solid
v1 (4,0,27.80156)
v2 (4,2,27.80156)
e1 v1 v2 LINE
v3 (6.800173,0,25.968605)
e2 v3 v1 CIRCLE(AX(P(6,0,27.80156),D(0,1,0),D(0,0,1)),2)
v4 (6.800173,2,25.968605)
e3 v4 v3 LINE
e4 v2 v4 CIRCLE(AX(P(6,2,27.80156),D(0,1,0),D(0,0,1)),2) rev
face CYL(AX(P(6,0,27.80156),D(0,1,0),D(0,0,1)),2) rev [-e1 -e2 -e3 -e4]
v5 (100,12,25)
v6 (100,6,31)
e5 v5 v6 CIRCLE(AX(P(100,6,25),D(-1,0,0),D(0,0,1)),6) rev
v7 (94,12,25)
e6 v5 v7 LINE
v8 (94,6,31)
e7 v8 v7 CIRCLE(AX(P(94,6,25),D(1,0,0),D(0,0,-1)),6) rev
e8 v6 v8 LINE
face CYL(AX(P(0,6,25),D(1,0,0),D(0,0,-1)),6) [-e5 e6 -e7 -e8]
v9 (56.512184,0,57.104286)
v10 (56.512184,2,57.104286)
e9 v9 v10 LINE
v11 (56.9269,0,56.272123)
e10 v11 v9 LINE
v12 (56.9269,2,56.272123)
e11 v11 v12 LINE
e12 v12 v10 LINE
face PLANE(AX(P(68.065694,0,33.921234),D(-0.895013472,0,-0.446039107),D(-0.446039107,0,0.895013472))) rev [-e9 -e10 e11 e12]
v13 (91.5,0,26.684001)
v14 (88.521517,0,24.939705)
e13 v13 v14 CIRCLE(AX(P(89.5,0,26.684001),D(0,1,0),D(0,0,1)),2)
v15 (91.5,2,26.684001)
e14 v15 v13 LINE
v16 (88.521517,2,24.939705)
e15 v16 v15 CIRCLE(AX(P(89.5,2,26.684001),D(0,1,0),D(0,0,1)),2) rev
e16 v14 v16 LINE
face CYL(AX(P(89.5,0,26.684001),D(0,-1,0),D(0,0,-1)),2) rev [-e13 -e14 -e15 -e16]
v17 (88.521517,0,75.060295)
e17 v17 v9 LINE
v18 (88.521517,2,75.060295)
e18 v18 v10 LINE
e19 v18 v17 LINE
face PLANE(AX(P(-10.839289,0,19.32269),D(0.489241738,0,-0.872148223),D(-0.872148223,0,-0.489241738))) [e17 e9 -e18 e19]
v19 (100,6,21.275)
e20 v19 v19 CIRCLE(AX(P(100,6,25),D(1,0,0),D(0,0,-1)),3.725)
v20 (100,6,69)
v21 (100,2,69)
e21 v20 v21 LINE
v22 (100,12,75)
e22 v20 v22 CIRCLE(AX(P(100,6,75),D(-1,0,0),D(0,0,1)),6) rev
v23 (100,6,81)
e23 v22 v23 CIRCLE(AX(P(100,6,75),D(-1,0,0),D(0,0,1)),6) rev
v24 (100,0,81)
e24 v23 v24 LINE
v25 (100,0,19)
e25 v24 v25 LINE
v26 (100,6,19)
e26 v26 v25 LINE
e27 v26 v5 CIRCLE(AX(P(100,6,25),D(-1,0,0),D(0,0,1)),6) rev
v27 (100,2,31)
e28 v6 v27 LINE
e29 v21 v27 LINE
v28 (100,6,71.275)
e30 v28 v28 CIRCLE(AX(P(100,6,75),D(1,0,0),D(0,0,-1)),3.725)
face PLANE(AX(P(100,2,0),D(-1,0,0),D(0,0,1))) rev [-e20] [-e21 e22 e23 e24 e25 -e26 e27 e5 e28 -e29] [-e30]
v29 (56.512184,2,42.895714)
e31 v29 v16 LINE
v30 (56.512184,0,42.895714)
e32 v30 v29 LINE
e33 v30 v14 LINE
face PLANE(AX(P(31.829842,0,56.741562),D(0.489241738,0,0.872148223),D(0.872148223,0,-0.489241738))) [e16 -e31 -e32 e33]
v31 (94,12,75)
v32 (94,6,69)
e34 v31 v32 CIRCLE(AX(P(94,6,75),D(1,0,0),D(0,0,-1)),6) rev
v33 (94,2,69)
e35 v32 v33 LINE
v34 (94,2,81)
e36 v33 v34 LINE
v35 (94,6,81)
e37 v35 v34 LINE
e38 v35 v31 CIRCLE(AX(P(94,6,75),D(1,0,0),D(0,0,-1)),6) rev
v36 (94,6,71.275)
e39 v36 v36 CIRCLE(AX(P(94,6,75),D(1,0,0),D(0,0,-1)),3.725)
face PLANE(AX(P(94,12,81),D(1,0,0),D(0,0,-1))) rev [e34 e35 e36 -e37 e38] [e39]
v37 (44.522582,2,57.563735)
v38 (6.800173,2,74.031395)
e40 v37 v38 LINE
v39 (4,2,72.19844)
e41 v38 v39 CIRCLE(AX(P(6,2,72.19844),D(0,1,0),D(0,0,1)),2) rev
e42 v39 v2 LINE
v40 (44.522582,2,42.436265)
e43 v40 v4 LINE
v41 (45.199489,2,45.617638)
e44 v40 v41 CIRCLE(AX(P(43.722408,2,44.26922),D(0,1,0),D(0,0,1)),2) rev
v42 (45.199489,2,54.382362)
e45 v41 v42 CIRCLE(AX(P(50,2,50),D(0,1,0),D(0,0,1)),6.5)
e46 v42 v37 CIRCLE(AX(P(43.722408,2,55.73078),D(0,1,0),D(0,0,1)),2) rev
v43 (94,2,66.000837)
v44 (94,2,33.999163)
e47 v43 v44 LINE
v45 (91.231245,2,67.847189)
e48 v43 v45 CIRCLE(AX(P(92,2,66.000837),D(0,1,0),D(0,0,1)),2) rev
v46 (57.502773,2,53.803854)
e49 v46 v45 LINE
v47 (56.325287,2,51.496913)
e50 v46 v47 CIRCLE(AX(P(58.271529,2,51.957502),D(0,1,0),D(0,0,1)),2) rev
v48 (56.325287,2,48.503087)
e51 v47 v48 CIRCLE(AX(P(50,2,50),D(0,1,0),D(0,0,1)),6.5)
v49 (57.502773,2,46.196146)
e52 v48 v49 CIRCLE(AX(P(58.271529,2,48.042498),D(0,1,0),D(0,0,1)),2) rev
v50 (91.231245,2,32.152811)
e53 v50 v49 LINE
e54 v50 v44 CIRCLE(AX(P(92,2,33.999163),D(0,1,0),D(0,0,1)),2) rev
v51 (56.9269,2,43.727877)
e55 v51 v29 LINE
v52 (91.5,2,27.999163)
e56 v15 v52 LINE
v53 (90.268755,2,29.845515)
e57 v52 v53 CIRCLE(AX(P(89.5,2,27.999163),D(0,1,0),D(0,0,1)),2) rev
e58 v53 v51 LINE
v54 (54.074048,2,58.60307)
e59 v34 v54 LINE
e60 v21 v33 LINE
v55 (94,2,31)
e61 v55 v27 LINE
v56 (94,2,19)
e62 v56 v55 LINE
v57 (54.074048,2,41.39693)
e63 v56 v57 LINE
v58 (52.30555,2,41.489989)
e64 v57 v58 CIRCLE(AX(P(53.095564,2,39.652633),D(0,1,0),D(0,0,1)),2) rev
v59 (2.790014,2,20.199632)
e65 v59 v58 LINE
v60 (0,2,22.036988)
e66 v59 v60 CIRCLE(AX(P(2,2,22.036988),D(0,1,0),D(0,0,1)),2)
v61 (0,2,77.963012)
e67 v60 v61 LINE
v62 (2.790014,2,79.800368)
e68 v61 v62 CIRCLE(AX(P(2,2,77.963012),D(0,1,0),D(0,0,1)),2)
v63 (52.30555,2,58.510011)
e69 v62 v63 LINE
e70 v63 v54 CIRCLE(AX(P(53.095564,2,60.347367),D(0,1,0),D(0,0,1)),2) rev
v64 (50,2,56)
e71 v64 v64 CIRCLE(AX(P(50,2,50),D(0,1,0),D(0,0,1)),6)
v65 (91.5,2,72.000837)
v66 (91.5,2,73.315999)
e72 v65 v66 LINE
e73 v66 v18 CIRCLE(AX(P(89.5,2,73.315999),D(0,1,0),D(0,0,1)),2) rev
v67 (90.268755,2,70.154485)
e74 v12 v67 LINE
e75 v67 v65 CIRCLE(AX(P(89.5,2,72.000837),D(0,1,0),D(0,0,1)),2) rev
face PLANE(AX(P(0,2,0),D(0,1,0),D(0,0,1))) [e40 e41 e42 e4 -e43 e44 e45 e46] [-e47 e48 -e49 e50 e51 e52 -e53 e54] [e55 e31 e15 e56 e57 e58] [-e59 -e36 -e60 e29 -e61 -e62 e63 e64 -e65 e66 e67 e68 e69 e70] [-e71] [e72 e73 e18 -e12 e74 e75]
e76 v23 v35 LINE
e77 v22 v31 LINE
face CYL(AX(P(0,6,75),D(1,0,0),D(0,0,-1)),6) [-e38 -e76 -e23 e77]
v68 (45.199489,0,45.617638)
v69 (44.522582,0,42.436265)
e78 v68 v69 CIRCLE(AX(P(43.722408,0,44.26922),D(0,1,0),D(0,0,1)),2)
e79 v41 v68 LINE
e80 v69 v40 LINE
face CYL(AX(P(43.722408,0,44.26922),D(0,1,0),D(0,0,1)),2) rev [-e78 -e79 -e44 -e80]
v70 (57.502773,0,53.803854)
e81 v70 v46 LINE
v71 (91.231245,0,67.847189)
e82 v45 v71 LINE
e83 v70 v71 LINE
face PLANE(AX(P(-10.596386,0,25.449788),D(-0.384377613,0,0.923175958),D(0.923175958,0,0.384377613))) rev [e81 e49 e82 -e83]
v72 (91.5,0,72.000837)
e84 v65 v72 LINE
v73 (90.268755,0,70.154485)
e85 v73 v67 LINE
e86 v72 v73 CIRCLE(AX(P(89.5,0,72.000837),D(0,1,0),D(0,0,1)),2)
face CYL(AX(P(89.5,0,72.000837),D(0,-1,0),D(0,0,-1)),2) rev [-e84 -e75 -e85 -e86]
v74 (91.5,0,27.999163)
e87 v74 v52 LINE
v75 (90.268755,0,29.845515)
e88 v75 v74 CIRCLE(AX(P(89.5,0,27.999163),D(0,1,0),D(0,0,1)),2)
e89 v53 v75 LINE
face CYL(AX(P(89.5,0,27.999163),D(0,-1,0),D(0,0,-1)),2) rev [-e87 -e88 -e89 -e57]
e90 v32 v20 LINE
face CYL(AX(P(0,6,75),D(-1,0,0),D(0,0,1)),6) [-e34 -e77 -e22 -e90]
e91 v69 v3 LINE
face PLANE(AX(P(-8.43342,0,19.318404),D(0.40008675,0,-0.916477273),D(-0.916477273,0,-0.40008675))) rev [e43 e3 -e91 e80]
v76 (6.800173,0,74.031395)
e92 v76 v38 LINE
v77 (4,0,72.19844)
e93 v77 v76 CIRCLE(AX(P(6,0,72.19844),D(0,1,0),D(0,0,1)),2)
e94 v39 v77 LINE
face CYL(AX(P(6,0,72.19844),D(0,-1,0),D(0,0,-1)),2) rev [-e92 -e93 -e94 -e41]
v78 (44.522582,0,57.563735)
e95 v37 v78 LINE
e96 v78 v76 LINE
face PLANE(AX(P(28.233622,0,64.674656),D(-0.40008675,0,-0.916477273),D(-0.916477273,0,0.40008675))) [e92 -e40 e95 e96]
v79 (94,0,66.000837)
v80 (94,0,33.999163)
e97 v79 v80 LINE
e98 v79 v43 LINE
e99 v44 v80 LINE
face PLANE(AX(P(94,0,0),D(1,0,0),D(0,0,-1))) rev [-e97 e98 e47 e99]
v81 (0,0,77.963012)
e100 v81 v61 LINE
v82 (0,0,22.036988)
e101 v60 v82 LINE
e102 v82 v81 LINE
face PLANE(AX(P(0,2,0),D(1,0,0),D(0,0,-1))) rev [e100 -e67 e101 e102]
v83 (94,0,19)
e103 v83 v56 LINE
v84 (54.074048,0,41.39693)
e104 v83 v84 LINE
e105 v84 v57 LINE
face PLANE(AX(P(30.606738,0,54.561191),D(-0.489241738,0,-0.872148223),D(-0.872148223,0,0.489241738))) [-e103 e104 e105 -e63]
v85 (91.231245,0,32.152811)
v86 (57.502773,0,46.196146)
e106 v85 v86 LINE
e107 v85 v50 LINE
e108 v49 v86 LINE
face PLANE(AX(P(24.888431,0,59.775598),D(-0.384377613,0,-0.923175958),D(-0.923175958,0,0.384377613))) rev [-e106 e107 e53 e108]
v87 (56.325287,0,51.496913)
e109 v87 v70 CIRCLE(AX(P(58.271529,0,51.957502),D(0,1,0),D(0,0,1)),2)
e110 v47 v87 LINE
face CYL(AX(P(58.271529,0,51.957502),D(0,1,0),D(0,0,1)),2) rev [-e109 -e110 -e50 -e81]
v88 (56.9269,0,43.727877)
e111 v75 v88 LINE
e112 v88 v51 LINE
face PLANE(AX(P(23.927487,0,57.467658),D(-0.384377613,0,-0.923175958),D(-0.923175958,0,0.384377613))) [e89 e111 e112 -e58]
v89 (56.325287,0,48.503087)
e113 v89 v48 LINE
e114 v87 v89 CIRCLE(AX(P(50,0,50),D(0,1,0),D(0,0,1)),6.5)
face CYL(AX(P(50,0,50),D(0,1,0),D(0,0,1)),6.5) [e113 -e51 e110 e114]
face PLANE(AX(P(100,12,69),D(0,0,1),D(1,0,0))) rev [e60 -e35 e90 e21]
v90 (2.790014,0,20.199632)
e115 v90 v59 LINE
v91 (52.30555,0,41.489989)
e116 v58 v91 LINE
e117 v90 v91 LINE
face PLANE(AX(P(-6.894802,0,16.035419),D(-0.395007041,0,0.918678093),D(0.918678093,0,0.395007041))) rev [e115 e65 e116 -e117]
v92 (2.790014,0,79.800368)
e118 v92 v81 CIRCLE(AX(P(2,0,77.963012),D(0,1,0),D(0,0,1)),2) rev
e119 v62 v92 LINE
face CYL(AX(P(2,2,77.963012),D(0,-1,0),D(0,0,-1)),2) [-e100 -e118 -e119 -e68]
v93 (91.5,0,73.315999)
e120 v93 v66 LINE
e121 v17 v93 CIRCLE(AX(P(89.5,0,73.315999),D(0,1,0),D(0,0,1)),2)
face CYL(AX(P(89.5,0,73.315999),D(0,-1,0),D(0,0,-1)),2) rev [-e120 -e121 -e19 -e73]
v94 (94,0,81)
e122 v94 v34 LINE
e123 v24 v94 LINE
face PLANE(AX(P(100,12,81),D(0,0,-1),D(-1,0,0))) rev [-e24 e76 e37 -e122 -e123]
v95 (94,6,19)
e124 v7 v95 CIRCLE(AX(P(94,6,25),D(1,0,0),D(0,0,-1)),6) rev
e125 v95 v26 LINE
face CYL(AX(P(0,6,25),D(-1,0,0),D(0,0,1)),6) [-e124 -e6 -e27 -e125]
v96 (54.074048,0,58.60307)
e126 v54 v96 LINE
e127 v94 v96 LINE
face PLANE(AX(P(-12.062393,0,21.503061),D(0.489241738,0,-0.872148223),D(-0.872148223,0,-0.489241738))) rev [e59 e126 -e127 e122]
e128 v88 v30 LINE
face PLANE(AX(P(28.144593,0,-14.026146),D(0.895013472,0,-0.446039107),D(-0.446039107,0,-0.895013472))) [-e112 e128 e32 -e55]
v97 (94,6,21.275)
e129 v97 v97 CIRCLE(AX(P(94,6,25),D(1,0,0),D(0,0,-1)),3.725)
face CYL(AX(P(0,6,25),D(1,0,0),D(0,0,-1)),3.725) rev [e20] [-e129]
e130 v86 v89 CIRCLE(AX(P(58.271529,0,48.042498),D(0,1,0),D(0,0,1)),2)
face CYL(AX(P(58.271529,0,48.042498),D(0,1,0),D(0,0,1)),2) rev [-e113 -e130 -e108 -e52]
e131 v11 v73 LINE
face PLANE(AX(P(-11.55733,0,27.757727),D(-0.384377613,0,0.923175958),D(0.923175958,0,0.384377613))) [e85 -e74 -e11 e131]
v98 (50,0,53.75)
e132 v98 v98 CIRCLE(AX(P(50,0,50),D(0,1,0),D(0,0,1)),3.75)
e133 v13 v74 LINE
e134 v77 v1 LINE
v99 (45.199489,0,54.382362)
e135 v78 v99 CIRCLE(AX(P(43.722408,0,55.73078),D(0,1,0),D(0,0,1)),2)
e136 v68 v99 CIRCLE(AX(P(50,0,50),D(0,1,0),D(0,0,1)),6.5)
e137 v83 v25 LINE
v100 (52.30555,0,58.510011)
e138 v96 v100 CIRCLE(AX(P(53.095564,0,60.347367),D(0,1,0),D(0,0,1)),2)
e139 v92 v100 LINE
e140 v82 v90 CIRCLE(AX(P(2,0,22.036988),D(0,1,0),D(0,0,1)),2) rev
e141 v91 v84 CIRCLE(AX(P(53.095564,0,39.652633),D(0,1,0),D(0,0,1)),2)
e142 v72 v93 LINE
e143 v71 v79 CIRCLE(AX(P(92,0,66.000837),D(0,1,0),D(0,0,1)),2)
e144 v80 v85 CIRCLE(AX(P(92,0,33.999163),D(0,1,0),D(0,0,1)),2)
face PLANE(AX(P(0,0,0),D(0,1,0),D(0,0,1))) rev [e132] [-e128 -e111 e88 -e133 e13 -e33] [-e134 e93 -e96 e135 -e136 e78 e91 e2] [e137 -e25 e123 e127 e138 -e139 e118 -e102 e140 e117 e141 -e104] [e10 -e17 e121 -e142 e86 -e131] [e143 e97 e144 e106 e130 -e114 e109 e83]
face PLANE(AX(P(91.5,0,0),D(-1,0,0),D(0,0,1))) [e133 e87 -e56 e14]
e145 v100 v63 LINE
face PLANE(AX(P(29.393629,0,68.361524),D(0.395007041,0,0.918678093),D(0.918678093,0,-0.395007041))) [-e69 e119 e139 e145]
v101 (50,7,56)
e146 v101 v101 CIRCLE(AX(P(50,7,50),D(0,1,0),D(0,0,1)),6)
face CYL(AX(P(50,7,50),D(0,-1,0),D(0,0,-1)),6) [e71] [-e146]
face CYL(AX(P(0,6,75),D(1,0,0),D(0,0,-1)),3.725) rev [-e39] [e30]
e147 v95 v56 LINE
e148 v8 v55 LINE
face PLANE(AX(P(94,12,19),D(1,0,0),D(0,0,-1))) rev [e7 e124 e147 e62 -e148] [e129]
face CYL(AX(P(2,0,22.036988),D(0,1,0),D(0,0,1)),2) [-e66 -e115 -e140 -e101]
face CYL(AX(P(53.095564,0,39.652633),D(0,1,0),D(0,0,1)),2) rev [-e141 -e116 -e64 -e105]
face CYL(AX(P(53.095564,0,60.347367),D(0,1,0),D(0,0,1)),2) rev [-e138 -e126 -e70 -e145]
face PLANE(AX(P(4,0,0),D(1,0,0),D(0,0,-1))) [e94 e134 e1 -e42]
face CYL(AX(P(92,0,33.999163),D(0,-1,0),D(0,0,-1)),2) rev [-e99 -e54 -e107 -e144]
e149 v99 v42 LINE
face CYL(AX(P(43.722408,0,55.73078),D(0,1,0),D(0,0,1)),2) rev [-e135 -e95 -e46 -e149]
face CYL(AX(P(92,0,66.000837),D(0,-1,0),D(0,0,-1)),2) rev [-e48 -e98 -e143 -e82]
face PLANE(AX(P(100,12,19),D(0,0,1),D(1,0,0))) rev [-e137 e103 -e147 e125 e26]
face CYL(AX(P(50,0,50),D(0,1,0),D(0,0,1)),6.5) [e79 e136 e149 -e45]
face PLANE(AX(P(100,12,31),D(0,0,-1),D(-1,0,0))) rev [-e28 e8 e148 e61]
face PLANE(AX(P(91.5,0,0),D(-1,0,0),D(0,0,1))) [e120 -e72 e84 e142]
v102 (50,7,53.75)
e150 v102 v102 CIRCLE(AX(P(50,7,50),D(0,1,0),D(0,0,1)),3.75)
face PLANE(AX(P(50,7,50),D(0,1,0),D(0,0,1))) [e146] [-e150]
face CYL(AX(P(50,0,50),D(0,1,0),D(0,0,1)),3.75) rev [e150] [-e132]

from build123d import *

# Parameters (mm, degrees)
SKETCH_1_W          = 100
SKETCH_1_H          = 100
EXTRUDE_1_DEPTH     = 2
SKETCH_2_W          = 6
SKETCH_2_H          = 12
EXTRUDE_2_DEPTH     = 10
SKETCH_3_R          = 3.725
CUT_EXTRUDE_1_DEPTH = 142.929559994
SKETCH_4_R          = 6
EXTRUDE_3_DEPTH     = 5
SKETCH_5_R          = 3.75
CUT_EXTRUDE_2_DEPTH = 142.594491418
SKETCH_6_W          = 100
SKETCH_6_H          = 19
CUT_EXTRUDE_3_DEPTH = 142.774468788
CUT_EXTRUDE_4_DEPTH = 130.077496102
FILLET_1_R          = 6
CUT_EXTRUDE_6_DEPTH = 130.077496102
FILLET_2_R          = 2
FILLET_3_R          = 2


# Some blends are built 0.0001 mm under size
with BuildPart() as part:
    # 草图1 → 凸台-拉伸1 (new body)
    with BuildSketch(Plane(origin=(0, 0, 0), x_dir=(1, 0, 0), z_dir=(0, 1, 0))):
        with Locations((50, -50)):
            Rectangle(SKETCH_1_W, SKETCH_1_H)
    extrude(amount=EXTRUDE_1_DEPTH)

    # 草图2 → 凸台-拉伸2 (add)
    with BuildSketch(Plane(origin=(0, 2, 0), x_dir=(1, 0, 0), z_dir=(0, 1, 0))):
        with Locations((97, -25)):
            Rectangle(SKETCH_2_W, SKETCH_2_H)
        with Locations((97, -75)):
            Rectangle(SKETCH_2_W, SKETCH_2_H)
    extrude(amount=EXTRUDE_2_DEPTH)

    # 草图3 → 切除-拉伸1 (cut, through all)
    with BuildSketch(Plane(origin=(100, 0, 0), x_dir=(0, 0, -1), z_dir=(1, 0, 0))):
        with Locations((-25, 6)):
            Circle(SKETCH_3_R)
        with Locations((-75, 6)):
            Circle(SKETCH_3_R)
    extrude(amount=-CUT_EXTRUDE_1_DEPTH, mode=Mode.SUBTRACT)

    # 草图4 → 凸台-拉伸3 (add)
    with BuildSketch(Plane(origin=(0, 2, 0), x_dir=(1, 0, 0), z_dir=(0, 1, 0))):
        with Locations(Location((50, -50, 0), (0, 0, 270))):
            Circle(SKETCH_4_R)
    extrude(amount=EXTRUDE_3_DEPTH)

    # 草图5 → 切除-拉伸2 (cut, through all)
    with BuildSketch(Plane(origin=(0, 7, 0), x_dir=(1, 0, 0), z_dir=(0, 1, 0))):
        with Locations(Location((50, -50, 0), (0, 0, 270))):
            Circle(SKETCH_5_R)
    extrude(amount=-CUT_EXTRUDE_2_DEPTH, mode=Mode.SUBTRACT)

    # 草图6 → 切除-拉伸3 (cut, through all)
    with BuildSketch(Plane(origin=(0, 2, 0), x_dir=(1, 0, 0), z_dir=(0, 1, 0))):
        with Locations((50, -90.5)):
            Rectangle(SKETCH_6_W, SKETCH_6_H)
        with Locations((50, -9.5)):
            Rectangle(SKETCH_6_W, SKETCH_6_H)
    extrude(amount=-CUT_EXTRUDE_3_DEPTH, mode=Mode.SUBTRACT)

    # 草图7 → 切除-拉伸4 (cut, through all)
    with BuildSketch(Plane(origin=(0, 2, 0), x_dir=(1, 0, 0), z_dir=(0, 1, 0))):
        with BuildLine():
            Line((55.73131114, -53.066279932), (94, -69))
            Line((94, -69), (94, -31))
            Line((94, -31), (55.73131114, -46.933720068))
            ThreePointArc((55.73131114, -46.933720068), (56.304899777, -48.41941821), (56.5, -50))
            ThreePointArc((56.5, -50), (56.304899777, -51.58058179), (55.73131114, -53.066279932))
        make_face()
        Polygon((0, -19), (53.212773637, -41.880071279), (94, -19), align=None)
        with BuildLine():
            Line((4, -75.253806127), (47.820913419, -56.123853499))
            ThreePointArc((47.820913419, -56.123853499), (43.5, -50), (47.820913419, -43.876146501))
            Line((47.820913419, -43.876146501), (4, -24.746193873))
            Line((4, -24.746193873), (4, -75.253806127))
        make_face()
        Polygon((94, -81), (53.212773637, -58.119928721), (0, -81), align=None)
    extrude(amount=-CUT_EXTRUDE_4_DEPTH, mode=Mode.SUBTRACT)

    # 圆角1
    fillet_1_edges = [part.edges().sort_by_distance(p)[0] for p in [
        (97, 12, 81),
        (97, 12, 69),
        (97, 12, 31),
        (97, 12, 19),
    ]]
    fillet(fillet_1_edges, radius=FILLET_1_R - 0.0001)  # a hair under: the kernel refuses the full size

    # 草图8 → 切除-拉伸6 (cut, through all)
    with BuildSketch(Plane(origin=(0, 2, 0), x_dir=(1, 0, 0), z_dir=(0, 1, 0))):
        Polygon((91.5, -23.268889447), (91.5, -29.332868234), (56.926900292, -43.727876504), (56.51218358, -42.895713945), align=None)
        Polygon((91.5, -70.667131766), (91.5, -76.731110553), (56.51218358, -57.104286055), (56.926900292, -56.272123496), align=None)
    extrude(amount=-CUT_EXTRUDE_6_DEPTH, mode=Mode.SUBTRACT)

    # 圆角2
    fillet_2_edges = [part.edges().sort_by_distance(p)[0] for p in [
        (47.820913419, 1, 43.876146501),
        (47.820913419, 1, 56.123853499),
        (55.73131114, 1, 53.066279932),
        (55.73131114, 1, 46.933720068),
    ]]
    fillet(fillet_2_edges, radius=FILLET_2_R)

    # 圆角3
    # the kernel refuses this fillet: 2 mm, written as the material it adds along each edge
    with BuildSketch(Plane(origin=(4, 2, 75.253806127), x_dir=(0, 0, -1), z_dir=(0, -1, 0)), Plane(origin=(4, 2, 24.746193873), x_dir=(0.9164772733710811, 0, 0.4000867498359684), z_dir=(0, -1, 0))) as fillet_3_piece_1:
        with BuildLine():
            CenterArc((FILLET_3_R * 1.52768299937, FILLET_3_R), FILLET_3_R, 156.416398259, 113.583601741)
            Line((FILLET_3_R * 0.611205725997, FILLET_3_R * 1.40008674984), (0, 0))
            Line((0, 0), (FILLET_3_R * 1.52768299937, 0))
        make_face()
    extrude(amount=2)
    with BuildSketch(Plane(origin=(53.212773637, 2, 58.119928721), x_dir=(-0.9186780925924477, 0, 0.39500704068497583), z_dir=(0, -1, 0))) as fillet_3_piece_2:
        with BuildLine():
            CenterArc((FILLET_3_R * 0.493765794488, -FILLET_3_R), FILLET_3_R, 90, 52.557168538)
            Line((-FILLET_3_R * 0.300194560291, -FILLET_3_R * 0.39203046537), (0, 0))
            Line((0, 0), (FILLET_3_R * 0.493765794488, 0))
        make_face()
    extrude(amount=2)
    with BuildSketch(Plane(origin=(53.212773637, 2, 41.880071279), x_dir=(-0.918678092592448, 0, -0.395007040684975), z_dir=(0, -1, 0))) as fillet_3_piece_3:
        with BuildLine():
            CenterArc((FILLET_3_R * 0.493765794488, FILLET_3_R), FILLET_3_R, 217.442831462, 52.557168538)
            Line((-FILLET_3_R * 0.300194560291, FILLET_3_R * 0.39203046537), (0, 0))
            Line((0, 0), (FILLET_3_R * 0.493765794488, 0))
        make_face()
    extrude(amount=2)
    with BuildSketch(Plane(origin=(91.5, 2, 23.268889447), x_dir=(-0.8721482225909527, 0, 0.48924173762204914), z_dir=(0, -1, 0))) as fillet_3_piece_4:
        with BuildLine():
            CenterArc((FILLET_3_R * 1.70755577899, -FILLET_3_R), FILLET_3_R, 90, 119.290755367)
            Line((FILLET_3_R * 0.8354075564, -FILLET_3_R * 1.48924173762), (0, 0))
            Line((0, 0), (FILLET_3_R * 1.70755577899, 0))
        make_face()
    extrude(amount=2)
    with BuildSketch(Plane(origin=(91.5, 2, 29.332868234), x_dir=(-0.9231759584436576, 0, 0.38437761348917576), z_dir=(0, -1, 0))) as fillet_3_piece_5:
        with BuildLine():
            CenterArc((FILLET_3_R * 0.666852706551, FILLET_3_R), FILLET_3_R, 202.605107184, 67.394892816)
            Line((-FILLET_3_R * 0.256323251893, FILLET_3_R * 0.615622386511), (0, 0))
            Line((0, 0), (FILLET_3_R * 0.666852706551, 0))
        make_face()
    extrude(amount=2)
    with BuildSketch(Plane(origin=(91.5, 2, 70.667131766), x_dir=(-0.923175958443657, 0, -0.38437761348917726), z_dir=(0, -1, 0))) as fillet_3_piece_6:
        with BuildLine():
            CenterArc((FILLET_3_R * 0.666852706551, -FILLET_3_R), FILLET_3_R, 90, 67.394892816)
            Line((-FILLET_3_R * 0.256323251893, -FILLET_3_R * 0.615622386511), (0, 0))
            Line((0, 0), (FILLET_3_R * 0.666852706551, 0))
        make_face()
    extrude(amount=2)
    with BuildSketch(Plane(origin=(91.5, 2, 76.731110553), x_dir=(-0.8721482225909533, 0, -0.4892417376220482), z_dir=(0, -1, 0))) as fillet_3_piece_7:
        with BuildLine():
            CenterArc((FILLET_3_R * 1.70755577899, FILLET_3_R), FILLET_3_R, 150.709244633, 119.290755367)
            Line((FILLET_3_R * 0.8354075564, FILLET_3_R * 1.48924173762), (0, 0))
            Line((0, 0), (FILLET_3_R * 1.70755577899, 0))
        make_face()
    extrude(amount=2)
    with BuildSketch(Plane(origin=(94, 2, 31), x_dir=(0, 0, 1), z_dir=(0, -1, 0)), Plane(origin=(94, 2, 69), x_dir=(-0.9231759584436573, 0, -0.3843776134891767), z_dir=(0, -1, 0))) as fillet_3_piece_8:
        with BuildLine():
            CenterArc((FILLET_3_R * 1.49958152704, FILLET_3_R), FILLET_3_R, 157.394892816, 112.605107184)
            Line((FILLET_3_R * 0.576405568596, FILLET_3_R * 1.38437761349), (0, 0))
            Line((0, 0), (FILLET_3_R * 1.49958152704, 0))
        make_face()
    extrude(amount=2)
    # the kernel refuses this fillet: 2 mm, written as the material it takes off along each edge
    with BuildSketch(Plane(origin=(0, 9.592469288, 81), x_dir=(0.9186780925924475, 0, -0.3950070406849762), z_dir=(0, -1, 0)), Plane(origin=(0, 9.592469288, 19), x_dir=(0, 0, 1), z_dir=(0, -1, 0))) as fillet_3_2_piece_1:
        with BuildLine():
            CenterArc((FILLET_3_R * 1.51849385757, -FILLET_3_R), FILLET_3_R, 90, 113.266413172)
            Line((FILLET_3_R * 0.599815764977, -FILLET_3_R * 1.39500704068), (0, 0))
            Line((0, 0), (FILLET_3_R * 1.51849385757, 0))
        make_face()
    extrude(amount=17.184938576, mode=Mode.SUBTRACT)


solid = part.part
